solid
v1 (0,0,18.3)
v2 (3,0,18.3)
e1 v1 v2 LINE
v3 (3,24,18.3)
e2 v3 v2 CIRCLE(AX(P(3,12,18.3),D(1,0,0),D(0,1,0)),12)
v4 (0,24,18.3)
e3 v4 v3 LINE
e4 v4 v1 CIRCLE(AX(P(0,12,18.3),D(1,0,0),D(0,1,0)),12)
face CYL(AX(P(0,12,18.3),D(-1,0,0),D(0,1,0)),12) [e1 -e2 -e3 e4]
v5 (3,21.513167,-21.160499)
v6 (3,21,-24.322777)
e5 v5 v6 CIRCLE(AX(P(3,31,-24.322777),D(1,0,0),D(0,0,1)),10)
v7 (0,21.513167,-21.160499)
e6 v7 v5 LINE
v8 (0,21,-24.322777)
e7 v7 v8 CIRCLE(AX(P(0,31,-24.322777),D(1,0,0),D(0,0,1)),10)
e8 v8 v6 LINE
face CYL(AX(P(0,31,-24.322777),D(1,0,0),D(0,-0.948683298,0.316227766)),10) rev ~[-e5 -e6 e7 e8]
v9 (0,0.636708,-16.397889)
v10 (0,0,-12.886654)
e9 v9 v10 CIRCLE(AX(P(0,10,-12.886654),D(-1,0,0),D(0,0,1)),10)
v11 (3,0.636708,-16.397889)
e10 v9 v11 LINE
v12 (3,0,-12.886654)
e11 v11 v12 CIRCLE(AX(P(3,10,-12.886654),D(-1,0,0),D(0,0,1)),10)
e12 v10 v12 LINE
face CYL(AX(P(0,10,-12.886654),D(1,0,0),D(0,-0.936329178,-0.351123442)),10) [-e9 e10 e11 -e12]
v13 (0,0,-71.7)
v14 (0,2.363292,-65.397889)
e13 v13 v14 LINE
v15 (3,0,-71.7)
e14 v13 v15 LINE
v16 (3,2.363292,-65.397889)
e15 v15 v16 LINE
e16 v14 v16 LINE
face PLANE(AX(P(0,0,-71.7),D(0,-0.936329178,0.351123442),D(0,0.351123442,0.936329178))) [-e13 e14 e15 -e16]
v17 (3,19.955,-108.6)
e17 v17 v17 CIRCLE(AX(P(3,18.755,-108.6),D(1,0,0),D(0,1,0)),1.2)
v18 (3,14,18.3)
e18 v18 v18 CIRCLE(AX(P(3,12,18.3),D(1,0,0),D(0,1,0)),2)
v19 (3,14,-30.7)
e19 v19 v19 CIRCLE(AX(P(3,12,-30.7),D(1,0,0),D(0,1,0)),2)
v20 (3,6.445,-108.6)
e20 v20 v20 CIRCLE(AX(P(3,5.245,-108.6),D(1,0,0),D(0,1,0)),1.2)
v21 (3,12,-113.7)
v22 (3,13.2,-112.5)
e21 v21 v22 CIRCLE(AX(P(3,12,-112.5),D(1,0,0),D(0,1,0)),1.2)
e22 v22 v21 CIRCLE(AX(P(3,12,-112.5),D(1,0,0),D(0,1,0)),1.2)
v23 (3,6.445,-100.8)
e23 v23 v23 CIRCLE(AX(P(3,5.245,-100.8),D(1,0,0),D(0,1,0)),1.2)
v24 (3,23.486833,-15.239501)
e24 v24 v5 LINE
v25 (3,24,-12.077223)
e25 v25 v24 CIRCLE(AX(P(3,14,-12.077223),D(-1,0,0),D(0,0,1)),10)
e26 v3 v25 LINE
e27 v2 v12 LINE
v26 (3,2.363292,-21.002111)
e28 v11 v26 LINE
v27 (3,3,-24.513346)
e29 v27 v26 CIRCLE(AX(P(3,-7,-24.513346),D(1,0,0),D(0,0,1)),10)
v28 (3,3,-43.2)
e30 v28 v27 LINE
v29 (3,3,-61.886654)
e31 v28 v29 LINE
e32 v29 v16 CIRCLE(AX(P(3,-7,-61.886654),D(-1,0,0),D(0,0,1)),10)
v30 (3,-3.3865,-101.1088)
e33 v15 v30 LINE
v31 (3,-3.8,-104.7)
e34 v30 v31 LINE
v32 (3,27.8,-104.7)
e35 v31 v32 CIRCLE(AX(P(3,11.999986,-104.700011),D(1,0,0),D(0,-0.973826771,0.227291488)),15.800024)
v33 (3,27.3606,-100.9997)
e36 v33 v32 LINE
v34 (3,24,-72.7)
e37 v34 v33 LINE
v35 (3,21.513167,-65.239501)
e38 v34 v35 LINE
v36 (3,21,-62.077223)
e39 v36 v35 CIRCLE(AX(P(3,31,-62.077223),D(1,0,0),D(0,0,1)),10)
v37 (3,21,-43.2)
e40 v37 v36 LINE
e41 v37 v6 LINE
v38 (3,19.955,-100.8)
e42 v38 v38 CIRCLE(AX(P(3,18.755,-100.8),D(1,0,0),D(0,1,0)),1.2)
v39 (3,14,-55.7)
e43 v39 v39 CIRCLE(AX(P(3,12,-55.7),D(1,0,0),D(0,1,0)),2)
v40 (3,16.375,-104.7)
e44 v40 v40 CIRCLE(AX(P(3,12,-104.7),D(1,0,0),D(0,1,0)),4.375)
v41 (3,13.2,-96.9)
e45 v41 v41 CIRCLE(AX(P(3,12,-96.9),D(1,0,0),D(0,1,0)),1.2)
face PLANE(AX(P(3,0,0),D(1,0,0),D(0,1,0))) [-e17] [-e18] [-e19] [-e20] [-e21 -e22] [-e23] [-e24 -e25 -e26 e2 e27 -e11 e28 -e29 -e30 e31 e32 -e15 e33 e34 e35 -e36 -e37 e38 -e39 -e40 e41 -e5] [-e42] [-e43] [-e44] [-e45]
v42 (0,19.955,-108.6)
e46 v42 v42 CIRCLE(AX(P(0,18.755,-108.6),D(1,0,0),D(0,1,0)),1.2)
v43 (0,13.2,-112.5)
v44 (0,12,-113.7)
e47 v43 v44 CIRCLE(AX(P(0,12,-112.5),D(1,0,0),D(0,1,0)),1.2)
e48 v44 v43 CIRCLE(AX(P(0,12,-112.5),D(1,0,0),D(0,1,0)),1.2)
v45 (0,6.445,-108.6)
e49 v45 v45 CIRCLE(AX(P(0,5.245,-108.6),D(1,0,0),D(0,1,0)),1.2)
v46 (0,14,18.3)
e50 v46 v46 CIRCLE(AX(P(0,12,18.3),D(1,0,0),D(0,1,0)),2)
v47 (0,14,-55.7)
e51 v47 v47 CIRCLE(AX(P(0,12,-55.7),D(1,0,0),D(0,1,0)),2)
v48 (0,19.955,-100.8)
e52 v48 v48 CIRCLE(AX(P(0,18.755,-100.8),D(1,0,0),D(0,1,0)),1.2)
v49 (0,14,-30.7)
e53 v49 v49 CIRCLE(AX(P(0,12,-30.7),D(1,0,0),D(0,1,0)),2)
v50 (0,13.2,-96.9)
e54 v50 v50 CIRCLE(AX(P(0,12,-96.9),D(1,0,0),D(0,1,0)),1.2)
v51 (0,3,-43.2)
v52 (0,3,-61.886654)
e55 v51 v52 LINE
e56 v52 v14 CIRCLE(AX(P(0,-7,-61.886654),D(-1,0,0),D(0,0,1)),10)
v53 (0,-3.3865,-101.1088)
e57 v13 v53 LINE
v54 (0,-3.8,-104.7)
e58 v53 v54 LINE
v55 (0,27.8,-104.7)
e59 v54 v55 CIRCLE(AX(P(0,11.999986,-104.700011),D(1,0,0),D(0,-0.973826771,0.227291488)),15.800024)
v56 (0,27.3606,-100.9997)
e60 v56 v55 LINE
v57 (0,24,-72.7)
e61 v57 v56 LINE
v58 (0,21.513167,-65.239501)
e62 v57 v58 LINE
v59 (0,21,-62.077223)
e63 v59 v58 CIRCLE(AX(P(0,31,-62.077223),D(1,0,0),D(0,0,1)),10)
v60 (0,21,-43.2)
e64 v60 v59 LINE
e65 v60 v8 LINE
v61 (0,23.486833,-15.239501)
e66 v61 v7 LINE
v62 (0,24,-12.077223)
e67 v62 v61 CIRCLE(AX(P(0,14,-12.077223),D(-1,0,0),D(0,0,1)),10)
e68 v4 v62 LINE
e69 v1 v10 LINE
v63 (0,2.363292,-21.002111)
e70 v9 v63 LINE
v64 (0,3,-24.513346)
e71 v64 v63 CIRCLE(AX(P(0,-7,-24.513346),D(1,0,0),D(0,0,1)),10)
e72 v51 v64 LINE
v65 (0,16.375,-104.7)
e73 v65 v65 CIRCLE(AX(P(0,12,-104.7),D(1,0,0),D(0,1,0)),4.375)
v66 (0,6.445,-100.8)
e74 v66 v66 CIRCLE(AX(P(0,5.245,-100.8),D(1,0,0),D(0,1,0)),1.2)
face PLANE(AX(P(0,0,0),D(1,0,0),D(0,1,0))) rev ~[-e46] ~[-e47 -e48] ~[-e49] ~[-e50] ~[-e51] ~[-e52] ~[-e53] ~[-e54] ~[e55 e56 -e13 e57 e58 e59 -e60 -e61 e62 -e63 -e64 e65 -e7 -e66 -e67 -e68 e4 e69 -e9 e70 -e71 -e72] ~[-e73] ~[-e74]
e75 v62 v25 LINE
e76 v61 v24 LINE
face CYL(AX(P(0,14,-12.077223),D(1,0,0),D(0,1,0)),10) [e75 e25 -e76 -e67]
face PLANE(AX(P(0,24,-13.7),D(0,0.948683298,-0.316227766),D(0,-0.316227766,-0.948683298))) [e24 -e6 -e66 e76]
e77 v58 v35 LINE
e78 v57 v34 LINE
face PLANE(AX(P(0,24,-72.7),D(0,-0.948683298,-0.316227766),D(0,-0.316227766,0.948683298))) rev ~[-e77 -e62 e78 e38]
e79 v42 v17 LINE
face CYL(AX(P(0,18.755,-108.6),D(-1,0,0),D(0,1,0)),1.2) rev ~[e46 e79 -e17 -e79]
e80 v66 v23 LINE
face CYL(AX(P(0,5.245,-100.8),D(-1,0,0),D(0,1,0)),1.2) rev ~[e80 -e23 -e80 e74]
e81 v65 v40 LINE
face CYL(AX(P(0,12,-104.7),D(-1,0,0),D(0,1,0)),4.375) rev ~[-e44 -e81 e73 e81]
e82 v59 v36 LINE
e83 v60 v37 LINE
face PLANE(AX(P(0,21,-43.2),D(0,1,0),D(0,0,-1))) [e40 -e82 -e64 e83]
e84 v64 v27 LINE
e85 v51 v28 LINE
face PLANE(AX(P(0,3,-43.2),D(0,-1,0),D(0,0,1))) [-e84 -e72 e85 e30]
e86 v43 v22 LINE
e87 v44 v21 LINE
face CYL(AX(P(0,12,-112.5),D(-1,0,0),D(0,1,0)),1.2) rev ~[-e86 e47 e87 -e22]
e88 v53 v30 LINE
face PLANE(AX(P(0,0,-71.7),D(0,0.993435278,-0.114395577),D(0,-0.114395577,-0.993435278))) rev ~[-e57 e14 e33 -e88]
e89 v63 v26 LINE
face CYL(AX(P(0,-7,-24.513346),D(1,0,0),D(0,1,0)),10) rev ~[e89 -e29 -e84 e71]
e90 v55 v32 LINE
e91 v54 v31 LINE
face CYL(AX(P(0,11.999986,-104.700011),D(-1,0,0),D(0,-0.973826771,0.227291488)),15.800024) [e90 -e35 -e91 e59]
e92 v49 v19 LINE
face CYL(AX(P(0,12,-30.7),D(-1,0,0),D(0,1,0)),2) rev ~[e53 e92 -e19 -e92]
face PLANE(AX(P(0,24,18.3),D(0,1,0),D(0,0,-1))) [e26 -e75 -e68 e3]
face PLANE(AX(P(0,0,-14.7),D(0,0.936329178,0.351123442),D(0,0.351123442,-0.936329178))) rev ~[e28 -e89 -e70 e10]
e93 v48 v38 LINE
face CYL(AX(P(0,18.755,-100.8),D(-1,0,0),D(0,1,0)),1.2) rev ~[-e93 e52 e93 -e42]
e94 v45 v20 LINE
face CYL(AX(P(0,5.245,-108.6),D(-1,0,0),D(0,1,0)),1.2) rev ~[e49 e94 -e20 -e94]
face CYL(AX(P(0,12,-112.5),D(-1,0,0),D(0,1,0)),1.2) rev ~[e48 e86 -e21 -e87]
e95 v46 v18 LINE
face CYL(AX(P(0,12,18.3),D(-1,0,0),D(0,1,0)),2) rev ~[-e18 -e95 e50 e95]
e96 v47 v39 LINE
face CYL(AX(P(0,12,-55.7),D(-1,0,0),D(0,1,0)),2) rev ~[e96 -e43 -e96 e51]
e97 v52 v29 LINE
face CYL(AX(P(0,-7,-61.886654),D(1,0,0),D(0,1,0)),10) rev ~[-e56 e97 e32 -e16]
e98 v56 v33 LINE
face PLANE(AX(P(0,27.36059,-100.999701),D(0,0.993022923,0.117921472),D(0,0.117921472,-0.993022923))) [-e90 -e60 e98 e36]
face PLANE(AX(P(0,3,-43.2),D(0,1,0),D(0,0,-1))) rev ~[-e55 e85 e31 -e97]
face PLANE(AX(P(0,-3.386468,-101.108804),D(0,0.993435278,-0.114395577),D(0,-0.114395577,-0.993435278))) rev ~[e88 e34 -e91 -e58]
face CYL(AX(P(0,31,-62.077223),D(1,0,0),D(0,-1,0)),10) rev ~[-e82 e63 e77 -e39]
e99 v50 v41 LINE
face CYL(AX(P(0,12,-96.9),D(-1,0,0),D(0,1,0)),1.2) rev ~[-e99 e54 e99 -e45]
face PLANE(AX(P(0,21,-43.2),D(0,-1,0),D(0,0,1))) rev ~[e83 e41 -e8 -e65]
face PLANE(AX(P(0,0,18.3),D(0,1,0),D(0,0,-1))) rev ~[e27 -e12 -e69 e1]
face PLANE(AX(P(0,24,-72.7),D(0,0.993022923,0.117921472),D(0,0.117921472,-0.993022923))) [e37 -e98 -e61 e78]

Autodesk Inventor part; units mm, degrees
ref_plane "YZ Plane" through (0, 0, 0) normal (1, 0, 0) x (0, 1, 0)
ref_plane "XZ Plane" through (0, 0, 0) normal (0, 1, 0) x (-1, 0, 0)
ref_plane "XY Plane" through (0, 0, 0) normal (0, 0, 1) x (1, 0, 0)
sketch "Sketch1" plane through (0, 0, 0) normal (1, 0, 0) x (0, 1, 0)
  circle A0 centre (12, -104.7) radius 4.375
  circle A1 centre (12, -104.7) radius 9 construction
  line L0 (12, -116.7) -> (12, -104.7) construction
  line L1 (12, -113.7) -> (12, -112.5)
  circle A2 centre (12, -112.5) radius 1.2
  circle A3 centre (12, -55.7) radius 2
  circle A4 centre (18.755, -108.6) radius 1.2
  circle A5 centre (18.755, -100.8) radius 1.2
  circle A6 centre (12, -96.9) radius 1.2
  circle A7 centre (5.245, -100.8) radius 1.2
  circle A8 centre (5.245, -108.6) radius 1.2
  line L2 (3, -43.2) -> (21, -43.2) construction
  line L3 (12, -116.7) -> (12, -71.7) construction
  line L4 (12, -71.7) -> (12, -63.7) construction
  line L5 (12, -63.7) -> (21, -63.7) construction
  line L6 (12, -63.7) -> (3, -63.7) construction
  line L7 (24, -72.7) -> (21, -63.7)
  line L8 (0, -71.7) -> (3, -63.7)
  line L9 (3, -43.2) -> (3, -63.7)
  line L10 (21, -43.2) -> (21, -63.7)
  arc A9 (24, 18.3) -> (0, 18.3) centre (12, 18.3) ccw
  circle A10 centre (12, -30.7) radius 2
  line L11 (12, -14.7) -> (12, -22.7) construction
  line L12 (12, -22.7) -> (21, -22.7) construction
  line L13 (12, -22.7) -> (3, -22.7) construction
  line L14 (24, -13.7) -> (21, -22.7)
  line L15 (0, -14.7) -> (3, -22.7)
  line L16 (3, -43.2) -> (3, -22.7)
  line L17 (0, 18.3) -> (0, -14.7)
  line L18 (24, 18.3) -> (24, -13.7)
  line L19 (21, -43.2) -> (21, -22.7)
  arc A11 (-3.3865, -101.1088) -> (27.3606, -100.9997) centre (12, -104.7) ccw
  line L20 (24, -72.7) -> (27.8, -104.7)
  line L21 (0, -71.7) -> (-3.8, -104.7)
  circle A12 centre (12, 18.3) radius 2
  point P0 (1.5, 26.1095)
  point P1 (22.5, 26.1095)
  point P2 (19.7942, -109.2)
  point P3 (19.7942, -100.2)
  point P4 (12, -95.7)
  point P5 (4.2058, -100.2)
  point P6 (4.2058, -109.2)
  dimension "d7" = 18
  dimension "d6" = 8.75
  dimension "d8" = 1.2
  dimension "d12" = 4
  dimension "d15" = 360
  dimension "d22" = 45
  dimension "d23" = 8
  dimension "d24" = 9
  dimension "d25" = 9
  dimension "d33" = 8
  dimension "d34" = 12.5
  dimension "d45" = 4
  dimension "d46" = 4
extrude "Extrusion2" add sketch "Sketch1" along normal blind 3 contours L20 A11 L21 L8 L9 L16 L15 L17 A9 L18 L14 L19 L10 L7
fillet "Face Fillet1" radius 10 1 edges at (1.5, 3, -22.7)
fillet "Face Fillet2" radius 10 1 edges at (1.5, 0, -14.7)
fillet "Face Fillet3" radius 10 1 edges at (1.5, 3, -63.7)
fillet "Face Fillet5" radius 10 1 edges at (1.5, 24, -13.7)
fillet "Face Fillet6" radius 10 1 edges at (1.5, 21, -22.7)
fillet "Face Fillet7" radius 10 1 edges at (1.5, 21, -63.7)
properties part number "Brazo1.1"
